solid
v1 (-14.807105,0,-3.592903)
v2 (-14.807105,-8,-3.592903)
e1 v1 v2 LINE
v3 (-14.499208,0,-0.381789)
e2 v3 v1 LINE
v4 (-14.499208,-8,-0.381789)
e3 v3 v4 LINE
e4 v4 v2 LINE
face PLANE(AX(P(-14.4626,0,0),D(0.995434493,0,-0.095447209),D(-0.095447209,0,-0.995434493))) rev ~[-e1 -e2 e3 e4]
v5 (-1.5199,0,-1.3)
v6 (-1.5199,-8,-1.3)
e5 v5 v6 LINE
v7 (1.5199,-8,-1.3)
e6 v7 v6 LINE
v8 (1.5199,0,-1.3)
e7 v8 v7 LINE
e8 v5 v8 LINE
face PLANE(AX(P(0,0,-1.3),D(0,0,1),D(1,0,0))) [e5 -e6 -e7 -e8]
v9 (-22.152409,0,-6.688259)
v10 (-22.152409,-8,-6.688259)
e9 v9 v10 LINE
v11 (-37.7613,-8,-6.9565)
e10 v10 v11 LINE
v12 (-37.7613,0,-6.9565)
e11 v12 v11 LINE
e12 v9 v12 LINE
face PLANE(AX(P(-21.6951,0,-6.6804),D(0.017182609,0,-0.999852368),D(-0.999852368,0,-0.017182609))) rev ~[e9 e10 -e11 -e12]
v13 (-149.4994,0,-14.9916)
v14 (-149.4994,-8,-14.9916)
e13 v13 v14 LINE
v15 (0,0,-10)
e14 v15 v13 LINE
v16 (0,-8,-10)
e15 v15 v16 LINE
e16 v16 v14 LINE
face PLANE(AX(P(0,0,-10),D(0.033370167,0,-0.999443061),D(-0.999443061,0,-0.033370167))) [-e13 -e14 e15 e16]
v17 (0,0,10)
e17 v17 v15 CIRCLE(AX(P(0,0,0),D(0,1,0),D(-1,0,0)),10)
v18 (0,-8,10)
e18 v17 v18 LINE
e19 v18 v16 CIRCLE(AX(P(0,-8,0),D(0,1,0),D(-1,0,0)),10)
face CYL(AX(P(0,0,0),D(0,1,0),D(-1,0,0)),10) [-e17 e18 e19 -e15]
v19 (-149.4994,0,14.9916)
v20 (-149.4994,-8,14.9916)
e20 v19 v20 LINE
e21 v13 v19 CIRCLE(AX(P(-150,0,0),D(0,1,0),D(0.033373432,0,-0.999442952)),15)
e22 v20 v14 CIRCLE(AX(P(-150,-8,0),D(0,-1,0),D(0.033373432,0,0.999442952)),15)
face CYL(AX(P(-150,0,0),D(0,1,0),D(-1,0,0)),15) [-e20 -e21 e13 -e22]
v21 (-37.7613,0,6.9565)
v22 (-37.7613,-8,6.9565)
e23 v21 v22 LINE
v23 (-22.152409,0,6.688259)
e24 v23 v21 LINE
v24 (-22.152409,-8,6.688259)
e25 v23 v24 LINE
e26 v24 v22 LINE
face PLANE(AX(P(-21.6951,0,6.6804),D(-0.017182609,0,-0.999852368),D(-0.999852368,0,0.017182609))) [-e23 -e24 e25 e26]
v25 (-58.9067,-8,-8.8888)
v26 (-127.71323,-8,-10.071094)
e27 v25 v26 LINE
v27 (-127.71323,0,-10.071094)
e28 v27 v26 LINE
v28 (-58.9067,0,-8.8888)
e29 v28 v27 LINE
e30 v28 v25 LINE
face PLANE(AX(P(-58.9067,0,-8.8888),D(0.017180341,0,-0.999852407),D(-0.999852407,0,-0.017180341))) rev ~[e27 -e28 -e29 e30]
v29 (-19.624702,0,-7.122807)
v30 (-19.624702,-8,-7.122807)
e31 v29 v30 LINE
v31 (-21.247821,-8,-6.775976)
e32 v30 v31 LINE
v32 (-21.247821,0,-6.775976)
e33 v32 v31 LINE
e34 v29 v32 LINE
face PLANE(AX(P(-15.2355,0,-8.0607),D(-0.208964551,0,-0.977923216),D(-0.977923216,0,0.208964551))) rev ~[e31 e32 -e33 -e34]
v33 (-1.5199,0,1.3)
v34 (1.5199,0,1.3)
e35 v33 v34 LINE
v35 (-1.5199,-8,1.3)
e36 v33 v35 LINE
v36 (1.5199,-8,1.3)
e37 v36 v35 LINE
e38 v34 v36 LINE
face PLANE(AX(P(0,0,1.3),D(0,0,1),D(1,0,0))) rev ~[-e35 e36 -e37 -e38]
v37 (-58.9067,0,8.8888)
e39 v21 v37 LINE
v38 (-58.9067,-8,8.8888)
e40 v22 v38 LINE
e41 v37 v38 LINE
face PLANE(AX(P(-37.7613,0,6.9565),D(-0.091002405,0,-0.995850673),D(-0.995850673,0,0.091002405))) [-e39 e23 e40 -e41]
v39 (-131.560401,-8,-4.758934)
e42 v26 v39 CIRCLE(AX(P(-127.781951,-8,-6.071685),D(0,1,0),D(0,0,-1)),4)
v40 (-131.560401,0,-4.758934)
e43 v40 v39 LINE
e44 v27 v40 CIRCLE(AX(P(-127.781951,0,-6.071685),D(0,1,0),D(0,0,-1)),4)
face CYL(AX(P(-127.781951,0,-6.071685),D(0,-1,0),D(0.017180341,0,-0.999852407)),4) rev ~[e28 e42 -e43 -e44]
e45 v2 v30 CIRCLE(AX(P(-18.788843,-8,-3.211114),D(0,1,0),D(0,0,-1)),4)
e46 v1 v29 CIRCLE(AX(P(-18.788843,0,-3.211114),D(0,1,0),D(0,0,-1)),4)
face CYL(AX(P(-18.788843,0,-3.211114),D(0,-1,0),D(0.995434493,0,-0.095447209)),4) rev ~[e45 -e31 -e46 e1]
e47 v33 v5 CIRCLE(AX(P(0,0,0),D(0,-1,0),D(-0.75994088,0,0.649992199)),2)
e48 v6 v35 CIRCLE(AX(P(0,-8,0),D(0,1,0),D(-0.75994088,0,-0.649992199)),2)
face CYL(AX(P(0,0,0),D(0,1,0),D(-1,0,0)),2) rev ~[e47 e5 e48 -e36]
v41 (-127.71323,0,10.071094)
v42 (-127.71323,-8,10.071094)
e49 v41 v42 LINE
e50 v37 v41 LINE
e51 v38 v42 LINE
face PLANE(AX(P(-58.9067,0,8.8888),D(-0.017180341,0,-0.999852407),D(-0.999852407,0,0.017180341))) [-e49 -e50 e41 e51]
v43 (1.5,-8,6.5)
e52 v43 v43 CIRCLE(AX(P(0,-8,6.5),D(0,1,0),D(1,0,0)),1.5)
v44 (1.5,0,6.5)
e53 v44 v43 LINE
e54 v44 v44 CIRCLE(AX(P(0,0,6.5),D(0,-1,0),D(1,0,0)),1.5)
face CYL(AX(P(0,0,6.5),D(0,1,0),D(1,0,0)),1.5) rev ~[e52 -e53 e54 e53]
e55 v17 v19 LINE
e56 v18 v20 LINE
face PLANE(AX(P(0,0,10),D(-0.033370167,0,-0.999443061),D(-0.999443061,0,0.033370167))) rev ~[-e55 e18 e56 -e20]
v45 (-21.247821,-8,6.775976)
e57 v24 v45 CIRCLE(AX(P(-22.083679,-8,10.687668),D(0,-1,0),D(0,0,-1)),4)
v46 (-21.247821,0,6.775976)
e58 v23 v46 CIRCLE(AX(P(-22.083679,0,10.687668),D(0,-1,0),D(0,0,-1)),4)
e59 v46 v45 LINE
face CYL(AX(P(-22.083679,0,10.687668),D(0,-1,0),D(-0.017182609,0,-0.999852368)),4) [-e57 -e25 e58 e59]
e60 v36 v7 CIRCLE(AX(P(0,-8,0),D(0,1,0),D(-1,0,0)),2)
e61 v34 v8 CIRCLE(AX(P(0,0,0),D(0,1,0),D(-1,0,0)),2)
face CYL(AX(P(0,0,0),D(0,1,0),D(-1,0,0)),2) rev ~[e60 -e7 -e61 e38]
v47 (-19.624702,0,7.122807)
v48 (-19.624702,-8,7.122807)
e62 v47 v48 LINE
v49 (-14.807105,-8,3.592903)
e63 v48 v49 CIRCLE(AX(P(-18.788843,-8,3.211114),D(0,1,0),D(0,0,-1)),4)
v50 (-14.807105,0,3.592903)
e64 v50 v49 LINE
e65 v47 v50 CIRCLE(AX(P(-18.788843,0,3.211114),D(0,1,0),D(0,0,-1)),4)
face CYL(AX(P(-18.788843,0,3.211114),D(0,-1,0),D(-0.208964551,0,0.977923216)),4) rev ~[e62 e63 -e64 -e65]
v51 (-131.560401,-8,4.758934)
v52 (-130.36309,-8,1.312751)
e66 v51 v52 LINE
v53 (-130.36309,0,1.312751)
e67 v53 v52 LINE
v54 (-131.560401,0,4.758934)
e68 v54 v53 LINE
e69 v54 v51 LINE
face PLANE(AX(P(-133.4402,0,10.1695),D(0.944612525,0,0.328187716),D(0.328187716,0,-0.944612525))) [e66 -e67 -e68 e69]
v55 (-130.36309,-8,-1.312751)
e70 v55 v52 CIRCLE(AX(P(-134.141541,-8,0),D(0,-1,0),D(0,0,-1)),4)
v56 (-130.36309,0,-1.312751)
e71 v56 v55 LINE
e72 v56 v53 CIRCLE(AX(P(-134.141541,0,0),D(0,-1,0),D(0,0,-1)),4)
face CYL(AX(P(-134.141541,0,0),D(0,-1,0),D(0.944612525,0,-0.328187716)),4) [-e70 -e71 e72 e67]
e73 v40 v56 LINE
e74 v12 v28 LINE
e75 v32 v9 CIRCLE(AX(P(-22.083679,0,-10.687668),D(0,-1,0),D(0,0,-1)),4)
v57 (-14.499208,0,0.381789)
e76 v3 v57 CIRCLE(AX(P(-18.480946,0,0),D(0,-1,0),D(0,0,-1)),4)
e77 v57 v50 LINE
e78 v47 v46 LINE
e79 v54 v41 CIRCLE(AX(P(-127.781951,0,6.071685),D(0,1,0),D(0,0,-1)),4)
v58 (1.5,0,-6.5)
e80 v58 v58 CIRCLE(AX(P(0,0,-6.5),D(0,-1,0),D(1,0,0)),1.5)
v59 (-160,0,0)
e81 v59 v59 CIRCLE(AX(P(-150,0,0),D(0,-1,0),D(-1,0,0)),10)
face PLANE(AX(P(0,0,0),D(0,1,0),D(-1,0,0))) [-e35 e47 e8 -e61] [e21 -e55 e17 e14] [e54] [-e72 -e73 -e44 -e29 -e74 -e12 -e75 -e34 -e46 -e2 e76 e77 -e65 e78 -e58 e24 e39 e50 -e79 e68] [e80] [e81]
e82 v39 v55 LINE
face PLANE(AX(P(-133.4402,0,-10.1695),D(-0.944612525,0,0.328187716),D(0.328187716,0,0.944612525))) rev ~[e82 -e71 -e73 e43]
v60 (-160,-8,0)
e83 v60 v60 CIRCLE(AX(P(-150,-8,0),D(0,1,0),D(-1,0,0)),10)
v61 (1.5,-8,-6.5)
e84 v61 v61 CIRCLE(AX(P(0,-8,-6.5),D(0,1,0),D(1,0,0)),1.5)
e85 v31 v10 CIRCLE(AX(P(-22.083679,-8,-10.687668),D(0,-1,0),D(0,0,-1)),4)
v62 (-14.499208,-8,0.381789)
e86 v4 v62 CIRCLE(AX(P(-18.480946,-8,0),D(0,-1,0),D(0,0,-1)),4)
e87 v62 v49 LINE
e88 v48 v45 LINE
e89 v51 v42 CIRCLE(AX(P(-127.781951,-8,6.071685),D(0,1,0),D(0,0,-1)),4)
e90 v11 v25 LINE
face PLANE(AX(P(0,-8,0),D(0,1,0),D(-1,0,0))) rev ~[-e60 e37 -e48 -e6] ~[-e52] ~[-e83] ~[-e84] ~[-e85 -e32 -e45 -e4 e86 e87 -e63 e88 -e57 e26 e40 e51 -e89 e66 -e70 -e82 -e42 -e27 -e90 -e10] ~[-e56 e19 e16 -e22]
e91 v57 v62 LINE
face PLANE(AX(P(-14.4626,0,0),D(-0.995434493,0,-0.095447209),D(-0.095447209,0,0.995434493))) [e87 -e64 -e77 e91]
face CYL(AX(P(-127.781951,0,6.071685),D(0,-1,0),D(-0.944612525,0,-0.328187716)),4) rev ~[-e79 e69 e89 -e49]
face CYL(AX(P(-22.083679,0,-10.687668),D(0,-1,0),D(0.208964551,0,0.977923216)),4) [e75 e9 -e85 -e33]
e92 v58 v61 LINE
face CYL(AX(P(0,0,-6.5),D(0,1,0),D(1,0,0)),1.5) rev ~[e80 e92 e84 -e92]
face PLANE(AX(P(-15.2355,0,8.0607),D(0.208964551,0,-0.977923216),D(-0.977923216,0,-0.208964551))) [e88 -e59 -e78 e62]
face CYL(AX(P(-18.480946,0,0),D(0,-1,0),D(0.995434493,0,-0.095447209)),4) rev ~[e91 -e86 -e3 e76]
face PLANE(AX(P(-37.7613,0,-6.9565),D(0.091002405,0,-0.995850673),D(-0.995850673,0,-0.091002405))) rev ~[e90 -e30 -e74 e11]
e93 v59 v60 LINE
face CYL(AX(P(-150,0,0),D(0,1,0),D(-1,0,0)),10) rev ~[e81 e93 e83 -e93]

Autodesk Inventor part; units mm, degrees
ref_plane "YZ Plane" through (0, 0, 0) normal (1, 0, 0) x (0, 1, 0)
ref_plane "XZ Plane" through (0, 0, 0) normal (0, 1, 0) x (-1, 0, 0)
ref_plane "XY Plane" through (0, 0, 0) normal (0, 0, 1) x (1, 0, 0)
sketch "Sketch1" plane through (0, 0, 0) normal (0, 1, 0) x (-1, 0, 0)
  line L0 (0, 8.5) -> (0, 6.3)
  line L1 (0, -6.3) -> (0, -8.5)
  line L2 (0, 0) -> (150, 0)
  circle A0 centre (150, 0) radius 10
  circle A1 centre (150, 0) radius 15
  circle A2 centre (0, 0) radius 2
  circle A3 centre (0, 0) radius 1.3
  line L3 (0, 1.3) -> (1.5199, 1.3)
  line L4 (0, 1.3) -> (-1.5199, 1.3)
  line L5 (0, -1.3) -> (1.5199, -1.3)
  line L6 (0, -1.3) -> (-1.5199, -1.3)
  circle A4 centre (0, 0) radius 10
  line L7 (0, 10) -> (149.4994, 14.9916)
  line L8 (0, -10) -> (149.4994, -14.9916)
  dimension "d8" = 30
  dimension "d13" = 20
  dimension "d6" = 150
  dimension "d7" = 20
  dimension "d11" = 4
  dimension "d12" = 2.6
extrude "Extrusion2" add sketch "Sketch1" against normal blind 8 contours L4 A2 L3 | L5 A2 L6 | A4 L7 A1 L2 | A4 | L2 A1 L8 A4 | A1
sketch "Sketch3" plane through (0, 0, 0) normal (0, 1, 0) x (1, 0, 0)
  line L0 (-14.4626, 0) -> (-15.2355, -8.0607)
  line L1 (-15.2355, -8.0607) -> (-21.6951, -6.6804)
  line L2 (-21.6951, -6.6804) -> (-37.7613, -6.9565)
  line L3 (-37.7613, -6.9565) -> (-58.9067, -8.8888)
  line L4 (-58.9067, -8.8888) -> (-133.4402, -10.1695)
  line L5 (-133.4402, -10.1695) -> (-129.907, 0)
  line L6 (-129.907, 0) -> (-14.4626, 0)
  line L7 (-14.4626, 0) -> (-15.2355, 8.0607)
  line L8 (-15.2355, 8.0607) -> (-21.6951, 6.6804)
  line L9 (-21.6951, 6.6804) -> (-37.7613, 6.9565)
  line L10 (-37.7613, 6.9565) -> (-58.9067, 8.8888)
  line L11 (-58.9067, 8.8888) -> (-133.4402, 10.1695)
  line L12 (-133.4402, 10.1695) -> (-129.907, 0)
  point P0 (0, 0)
extrude "Extrusion3" cut sketch "Sketch3" against normal through all
fillet "Fillet1" radius 4 12 edges at (-15.2355, -4, -8.0607) (-14.4626, -4, 0) (-15.2355, -4, 8.0607) (-21.6951, -4, 6.6804) (-37.7613, -4, 6.9565) (-21.6951, -4, -6.6804) (-37.7613, -4, -6.9565) (-58.9067, -4, -8.8888) (-133.4402, -4, -10.1695) (-129.907, -4, 0) (-133.4402, -4, 10.1695) (-58.9067, -4, 8.8888)
sketch "Sketch4" plane through (0, 0, 0) normal (0, 1, 0) x (1, 0, 0)
  circle A0 centre (0, 0) radius 6.5
  circle A1 centre (0, 6.5) radius 1.5
  circle A2 centre (0, -6.5) radius 1.5
  dimension "d19" = 13
  dimension "d20" = 3
  dimension "d21" = 3
extrude "Extrusion4" cut sketch "Sketch4" against normal through all contours A1 A0 | A0 A1 | A2 A0 | A0 A2
properties material "Polycarbonate, Clear"
